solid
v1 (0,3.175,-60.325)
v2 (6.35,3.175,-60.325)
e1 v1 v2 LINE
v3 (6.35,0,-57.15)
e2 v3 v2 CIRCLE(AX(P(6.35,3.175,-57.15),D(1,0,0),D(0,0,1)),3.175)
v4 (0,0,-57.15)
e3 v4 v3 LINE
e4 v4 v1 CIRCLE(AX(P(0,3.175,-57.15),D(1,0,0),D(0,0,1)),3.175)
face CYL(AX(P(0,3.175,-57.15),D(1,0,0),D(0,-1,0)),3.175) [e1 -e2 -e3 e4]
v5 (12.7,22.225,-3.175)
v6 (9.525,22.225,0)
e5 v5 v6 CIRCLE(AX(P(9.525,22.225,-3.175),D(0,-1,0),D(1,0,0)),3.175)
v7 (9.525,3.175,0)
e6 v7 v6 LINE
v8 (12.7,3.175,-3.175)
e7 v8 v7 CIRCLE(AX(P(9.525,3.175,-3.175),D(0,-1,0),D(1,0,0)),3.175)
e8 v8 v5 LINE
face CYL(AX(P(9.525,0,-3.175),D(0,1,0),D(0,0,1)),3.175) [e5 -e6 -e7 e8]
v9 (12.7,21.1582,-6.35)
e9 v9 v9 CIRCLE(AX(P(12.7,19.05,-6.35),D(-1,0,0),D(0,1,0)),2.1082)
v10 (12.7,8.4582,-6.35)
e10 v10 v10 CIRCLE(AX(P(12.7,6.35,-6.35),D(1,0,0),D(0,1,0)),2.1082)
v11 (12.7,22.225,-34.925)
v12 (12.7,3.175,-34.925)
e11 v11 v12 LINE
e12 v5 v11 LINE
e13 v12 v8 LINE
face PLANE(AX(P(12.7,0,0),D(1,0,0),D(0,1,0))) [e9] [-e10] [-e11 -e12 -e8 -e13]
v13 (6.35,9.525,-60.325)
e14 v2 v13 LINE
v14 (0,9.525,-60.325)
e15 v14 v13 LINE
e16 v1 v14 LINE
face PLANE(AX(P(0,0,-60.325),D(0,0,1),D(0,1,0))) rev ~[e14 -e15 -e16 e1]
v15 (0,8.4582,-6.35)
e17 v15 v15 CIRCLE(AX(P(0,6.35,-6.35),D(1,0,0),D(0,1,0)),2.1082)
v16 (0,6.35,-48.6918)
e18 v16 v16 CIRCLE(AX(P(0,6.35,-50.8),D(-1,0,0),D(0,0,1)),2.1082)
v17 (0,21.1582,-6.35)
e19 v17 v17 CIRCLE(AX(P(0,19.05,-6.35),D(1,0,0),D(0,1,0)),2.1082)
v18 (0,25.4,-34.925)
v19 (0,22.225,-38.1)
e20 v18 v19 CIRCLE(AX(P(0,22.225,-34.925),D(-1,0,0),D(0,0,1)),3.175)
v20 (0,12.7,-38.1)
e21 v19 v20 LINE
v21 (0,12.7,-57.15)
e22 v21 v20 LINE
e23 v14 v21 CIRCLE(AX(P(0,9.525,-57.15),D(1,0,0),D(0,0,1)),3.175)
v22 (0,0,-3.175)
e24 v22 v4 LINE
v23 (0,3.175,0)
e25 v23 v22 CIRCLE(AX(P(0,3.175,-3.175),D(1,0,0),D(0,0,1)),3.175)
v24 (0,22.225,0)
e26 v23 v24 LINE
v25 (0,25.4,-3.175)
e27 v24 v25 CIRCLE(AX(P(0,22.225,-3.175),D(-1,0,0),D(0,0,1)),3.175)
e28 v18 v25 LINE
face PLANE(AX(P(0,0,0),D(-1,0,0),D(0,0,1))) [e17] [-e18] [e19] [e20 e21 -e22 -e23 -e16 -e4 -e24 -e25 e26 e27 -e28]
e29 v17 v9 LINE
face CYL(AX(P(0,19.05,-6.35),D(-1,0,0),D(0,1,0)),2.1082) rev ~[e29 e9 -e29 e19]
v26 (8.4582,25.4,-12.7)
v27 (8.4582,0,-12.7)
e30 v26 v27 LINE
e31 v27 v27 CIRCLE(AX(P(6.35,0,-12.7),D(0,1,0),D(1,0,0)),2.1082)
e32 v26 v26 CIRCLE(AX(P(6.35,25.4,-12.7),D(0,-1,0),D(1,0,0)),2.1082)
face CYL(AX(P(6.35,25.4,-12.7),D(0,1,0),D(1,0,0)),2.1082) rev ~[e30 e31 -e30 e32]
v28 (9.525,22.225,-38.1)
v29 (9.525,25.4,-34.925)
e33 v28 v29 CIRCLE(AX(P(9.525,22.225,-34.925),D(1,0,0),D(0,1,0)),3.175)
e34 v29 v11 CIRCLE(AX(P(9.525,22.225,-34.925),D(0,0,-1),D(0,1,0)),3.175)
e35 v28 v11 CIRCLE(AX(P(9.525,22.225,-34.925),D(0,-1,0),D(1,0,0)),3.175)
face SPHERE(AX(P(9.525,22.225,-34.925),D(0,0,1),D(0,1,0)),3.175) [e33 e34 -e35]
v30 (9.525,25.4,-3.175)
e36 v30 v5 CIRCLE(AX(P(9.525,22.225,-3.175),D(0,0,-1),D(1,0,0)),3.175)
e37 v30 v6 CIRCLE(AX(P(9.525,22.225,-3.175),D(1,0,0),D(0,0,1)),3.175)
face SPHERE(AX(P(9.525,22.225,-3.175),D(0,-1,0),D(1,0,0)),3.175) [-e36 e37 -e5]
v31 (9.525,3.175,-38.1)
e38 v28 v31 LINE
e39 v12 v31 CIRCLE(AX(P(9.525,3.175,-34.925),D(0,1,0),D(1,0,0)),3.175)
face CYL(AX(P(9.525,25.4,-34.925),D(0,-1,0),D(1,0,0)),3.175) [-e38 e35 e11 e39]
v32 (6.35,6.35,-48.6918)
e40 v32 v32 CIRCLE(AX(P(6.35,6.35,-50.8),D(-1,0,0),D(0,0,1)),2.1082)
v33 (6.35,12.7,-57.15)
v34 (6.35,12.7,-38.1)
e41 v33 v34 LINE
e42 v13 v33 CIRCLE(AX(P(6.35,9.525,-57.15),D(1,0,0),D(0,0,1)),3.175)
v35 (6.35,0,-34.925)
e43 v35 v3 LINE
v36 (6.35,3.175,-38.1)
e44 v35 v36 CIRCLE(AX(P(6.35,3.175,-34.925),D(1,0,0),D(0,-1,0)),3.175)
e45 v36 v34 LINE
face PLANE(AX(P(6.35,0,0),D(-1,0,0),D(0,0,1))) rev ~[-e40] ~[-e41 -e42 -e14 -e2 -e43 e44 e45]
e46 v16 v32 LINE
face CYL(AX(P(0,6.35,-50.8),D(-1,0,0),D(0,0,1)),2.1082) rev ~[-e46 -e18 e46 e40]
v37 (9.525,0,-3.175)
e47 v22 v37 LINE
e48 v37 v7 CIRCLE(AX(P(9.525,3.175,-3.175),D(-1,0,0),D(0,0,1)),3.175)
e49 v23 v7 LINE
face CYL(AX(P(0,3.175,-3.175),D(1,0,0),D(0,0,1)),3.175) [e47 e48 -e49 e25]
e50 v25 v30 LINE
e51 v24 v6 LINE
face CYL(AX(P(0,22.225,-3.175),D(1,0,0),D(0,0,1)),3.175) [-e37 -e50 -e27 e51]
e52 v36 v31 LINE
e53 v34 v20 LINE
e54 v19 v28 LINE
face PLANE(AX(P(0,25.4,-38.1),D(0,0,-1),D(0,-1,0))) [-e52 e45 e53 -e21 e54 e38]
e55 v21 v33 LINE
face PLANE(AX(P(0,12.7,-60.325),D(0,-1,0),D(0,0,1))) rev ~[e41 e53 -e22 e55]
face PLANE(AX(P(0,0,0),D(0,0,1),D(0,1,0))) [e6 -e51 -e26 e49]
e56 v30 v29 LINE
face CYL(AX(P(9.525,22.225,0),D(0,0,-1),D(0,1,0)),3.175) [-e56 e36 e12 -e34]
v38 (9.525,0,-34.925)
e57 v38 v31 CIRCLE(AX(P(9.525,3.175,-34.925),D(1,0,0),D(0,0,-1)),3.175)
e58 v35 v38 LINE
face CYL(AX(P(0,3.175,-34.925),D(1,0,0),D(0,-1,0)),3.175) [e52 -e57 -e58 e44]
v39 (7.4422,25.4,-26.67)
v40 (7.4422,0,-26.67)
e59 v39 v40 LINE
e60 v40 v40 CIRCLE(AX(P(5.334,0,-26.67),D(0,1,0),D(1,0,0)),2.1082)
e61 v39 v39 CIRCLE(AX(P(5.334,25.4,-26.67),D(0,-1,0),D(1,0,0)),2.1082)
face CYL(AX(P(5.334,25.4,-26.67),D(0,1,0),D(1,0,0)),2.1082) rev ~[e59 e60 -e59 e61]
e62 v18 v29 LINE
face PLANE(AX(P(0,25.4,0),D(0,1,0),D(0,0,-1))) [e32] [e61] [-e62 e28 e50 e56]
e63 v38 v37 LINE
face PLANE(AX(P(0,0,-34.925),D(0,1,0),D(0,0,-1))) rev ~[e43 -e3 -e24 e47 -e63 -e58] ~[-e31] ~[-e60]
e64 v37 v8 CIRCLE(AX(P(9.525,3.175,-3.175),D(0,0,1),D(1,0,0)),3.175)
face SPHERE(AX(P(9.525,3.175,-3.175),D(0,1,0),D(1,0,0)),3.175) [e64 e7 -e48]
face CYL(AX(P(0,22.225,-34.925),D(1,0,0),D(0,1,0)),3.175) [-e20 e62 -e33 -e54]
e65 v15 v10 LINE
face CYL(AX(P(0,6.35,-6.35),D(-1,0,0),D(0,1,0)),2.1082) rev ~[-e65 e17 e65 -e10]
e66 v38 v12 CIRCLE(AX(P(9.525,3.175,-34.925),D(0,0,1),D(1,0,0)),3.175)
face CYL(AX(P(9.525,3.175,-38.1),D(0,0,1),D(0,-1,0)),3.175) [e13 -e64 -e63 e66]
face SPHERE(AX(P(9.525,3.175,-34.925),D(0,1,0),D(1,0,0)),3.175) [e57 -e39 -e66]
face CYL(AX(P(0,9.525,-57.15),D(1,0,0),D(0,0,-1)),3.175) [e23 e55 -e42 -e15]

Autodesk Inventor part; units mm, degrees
ref_plane "YZ Plane" through (0, 0, 0) normal (1, 0, 0) x (0, 1, 0)
ref_plane "XZ Plane" through (0, 0, 0) normal (0, 1, 0) x (-1, 0, 0)
ref_plane "XY Plane" through (0, 0, 0) normal (0, 0, 1) x (1, 0, 0)
sketch "Sketch1" plane through (0, 0, 0) normal (1, 0, 0) x (0, 1, 0)
  line L0 (0, 0) -> (25.4, 0)
  line L1 (25.4, 0) -> (25.4, -38.1)
  line L2 (25.4, -38.1) -> (0, -38.1)
  line L3 (0, -38.1) -> (0, 0)
  line L4 (25.4, 0) -> (25.4, -6.35)
  line L5 (25.4, -6.35) -> (19.05, -6.35)
  line L6 (19.05, -6.35) -> (6.35, -6.35)
  circle A0 centre (19.05, -6.35) radius 2.1082
  circle A1 centre (6.35, -6.35) radius 2.1082
  dimension "d0" = 38.1
  dimension "d1" = 25.4
  dimension "d2" = 6.35
  dimension "d3" = 6.35
  dimension "d4" = 12.7
  dimension "d5" = 4.2164
extrude "Extrusion1" add sketch "Sketch1" along normal blind 12.7
sketch "Sketch2" plane through (0, 25.4, 0) normal (0, 1, 0) x (1, 0, 0)
  line L0 (0, 0) -> (0, 38.1) projected
  line L1 (0, 38.1) -> (12.7, 38.1) projected
  line L2 (0, 38.1) -> (12.7, 38.1)
  circle A0 centre (6.35, 12.7) radius 2.1082
  line L3 (0, 0) -> (12.7, 0) projected
  line L4 (6.35, 0) -> (6.35, 12.7)
  dimension "d9" = 4.2164
extrude "Extrusion2" cut sketch "Sketch2" against normal blind 39.6875
fillet "Fillet1" radius 3.175 8 edges at (12.7, 12.7, 0) (12.7, 25.4, -19.05) (6.35, 25.4, -38.1) (12.7, 12.7, -38.1) (12.7, 0, -19.05) (6.35, 25.4, 0) (6.35, 0, 0) (6.35, 0, -38.1)
sketch "Sketch5" plane through (0, 25.4, -3.175) normal (0, 1, 0) x (1, 0, 0)
  circle A0 centre (6.35, 9.525) radius 2.1082 projected
  line L0 (6.35, 9.525) -> (6.35, 23.495)
  line L1 (6.35, 23.495) -> (5.334, 23.495)
  circle A1 centre (5.334, 23.495) radius 2.1082
  point P0 (0, -3.175)
  dimension "d22" = 13.97
  dimension "d23" = 1.016
  dimension "d24" = 4.2164
extrude "Extrusion5" cut sketch "Sketch5" against normal blind 57.15 contours A1
sketch "Sketch6" plane through (0, 0, 0) normal (-1, 0, 0) x (0, 0, 1)
  circle A0 centre (-6.35, 6.35) radius 2.1082 projected
  line L0 (-6.35, 6.35) -> (-50.8, 6.35)
  circle A1 centre (-50.8, 6.35) radius 2.1082
  line L1 (-3.175, 0) -> (-34.925, 0) projected
  line L2 (-3.175, 25.4) -> (-3.175, 22.225) projected
  line L3 (-3.175, 0) -> (-3.175, 25.4)
  line L4 (-3.175, 0) -> (-60.325, 0)
  line L5 (-60.325, 0) -> (-60.325, 12.7)
  line L6 (-60.325, 12.7) -> (-3.175, 12.7)
  line L7 (-3.175, 12.7) -> (-3.175, 0)
  line L8 (-34.925, 0) -> (-34.925, 12.7)
  line L9 (-34.925, 22.225) -> (-34.925, 3.175) projected
  point P0 (0, 0)
  point P1 (-34.925, 0)
  dimension "d27" = 44.45
  dimension "d28" = 57.15
extrude "Extrusion6" add sketch "Sketch6" against normal blind 6.35 contours L4 L5 L6 L8
fillet "Fillet2" radius 3.175 2 edges at (3.175, 12.7, -60.325) (3.175, 0, -60.325)
properties part number "wing mount 1 v1"
